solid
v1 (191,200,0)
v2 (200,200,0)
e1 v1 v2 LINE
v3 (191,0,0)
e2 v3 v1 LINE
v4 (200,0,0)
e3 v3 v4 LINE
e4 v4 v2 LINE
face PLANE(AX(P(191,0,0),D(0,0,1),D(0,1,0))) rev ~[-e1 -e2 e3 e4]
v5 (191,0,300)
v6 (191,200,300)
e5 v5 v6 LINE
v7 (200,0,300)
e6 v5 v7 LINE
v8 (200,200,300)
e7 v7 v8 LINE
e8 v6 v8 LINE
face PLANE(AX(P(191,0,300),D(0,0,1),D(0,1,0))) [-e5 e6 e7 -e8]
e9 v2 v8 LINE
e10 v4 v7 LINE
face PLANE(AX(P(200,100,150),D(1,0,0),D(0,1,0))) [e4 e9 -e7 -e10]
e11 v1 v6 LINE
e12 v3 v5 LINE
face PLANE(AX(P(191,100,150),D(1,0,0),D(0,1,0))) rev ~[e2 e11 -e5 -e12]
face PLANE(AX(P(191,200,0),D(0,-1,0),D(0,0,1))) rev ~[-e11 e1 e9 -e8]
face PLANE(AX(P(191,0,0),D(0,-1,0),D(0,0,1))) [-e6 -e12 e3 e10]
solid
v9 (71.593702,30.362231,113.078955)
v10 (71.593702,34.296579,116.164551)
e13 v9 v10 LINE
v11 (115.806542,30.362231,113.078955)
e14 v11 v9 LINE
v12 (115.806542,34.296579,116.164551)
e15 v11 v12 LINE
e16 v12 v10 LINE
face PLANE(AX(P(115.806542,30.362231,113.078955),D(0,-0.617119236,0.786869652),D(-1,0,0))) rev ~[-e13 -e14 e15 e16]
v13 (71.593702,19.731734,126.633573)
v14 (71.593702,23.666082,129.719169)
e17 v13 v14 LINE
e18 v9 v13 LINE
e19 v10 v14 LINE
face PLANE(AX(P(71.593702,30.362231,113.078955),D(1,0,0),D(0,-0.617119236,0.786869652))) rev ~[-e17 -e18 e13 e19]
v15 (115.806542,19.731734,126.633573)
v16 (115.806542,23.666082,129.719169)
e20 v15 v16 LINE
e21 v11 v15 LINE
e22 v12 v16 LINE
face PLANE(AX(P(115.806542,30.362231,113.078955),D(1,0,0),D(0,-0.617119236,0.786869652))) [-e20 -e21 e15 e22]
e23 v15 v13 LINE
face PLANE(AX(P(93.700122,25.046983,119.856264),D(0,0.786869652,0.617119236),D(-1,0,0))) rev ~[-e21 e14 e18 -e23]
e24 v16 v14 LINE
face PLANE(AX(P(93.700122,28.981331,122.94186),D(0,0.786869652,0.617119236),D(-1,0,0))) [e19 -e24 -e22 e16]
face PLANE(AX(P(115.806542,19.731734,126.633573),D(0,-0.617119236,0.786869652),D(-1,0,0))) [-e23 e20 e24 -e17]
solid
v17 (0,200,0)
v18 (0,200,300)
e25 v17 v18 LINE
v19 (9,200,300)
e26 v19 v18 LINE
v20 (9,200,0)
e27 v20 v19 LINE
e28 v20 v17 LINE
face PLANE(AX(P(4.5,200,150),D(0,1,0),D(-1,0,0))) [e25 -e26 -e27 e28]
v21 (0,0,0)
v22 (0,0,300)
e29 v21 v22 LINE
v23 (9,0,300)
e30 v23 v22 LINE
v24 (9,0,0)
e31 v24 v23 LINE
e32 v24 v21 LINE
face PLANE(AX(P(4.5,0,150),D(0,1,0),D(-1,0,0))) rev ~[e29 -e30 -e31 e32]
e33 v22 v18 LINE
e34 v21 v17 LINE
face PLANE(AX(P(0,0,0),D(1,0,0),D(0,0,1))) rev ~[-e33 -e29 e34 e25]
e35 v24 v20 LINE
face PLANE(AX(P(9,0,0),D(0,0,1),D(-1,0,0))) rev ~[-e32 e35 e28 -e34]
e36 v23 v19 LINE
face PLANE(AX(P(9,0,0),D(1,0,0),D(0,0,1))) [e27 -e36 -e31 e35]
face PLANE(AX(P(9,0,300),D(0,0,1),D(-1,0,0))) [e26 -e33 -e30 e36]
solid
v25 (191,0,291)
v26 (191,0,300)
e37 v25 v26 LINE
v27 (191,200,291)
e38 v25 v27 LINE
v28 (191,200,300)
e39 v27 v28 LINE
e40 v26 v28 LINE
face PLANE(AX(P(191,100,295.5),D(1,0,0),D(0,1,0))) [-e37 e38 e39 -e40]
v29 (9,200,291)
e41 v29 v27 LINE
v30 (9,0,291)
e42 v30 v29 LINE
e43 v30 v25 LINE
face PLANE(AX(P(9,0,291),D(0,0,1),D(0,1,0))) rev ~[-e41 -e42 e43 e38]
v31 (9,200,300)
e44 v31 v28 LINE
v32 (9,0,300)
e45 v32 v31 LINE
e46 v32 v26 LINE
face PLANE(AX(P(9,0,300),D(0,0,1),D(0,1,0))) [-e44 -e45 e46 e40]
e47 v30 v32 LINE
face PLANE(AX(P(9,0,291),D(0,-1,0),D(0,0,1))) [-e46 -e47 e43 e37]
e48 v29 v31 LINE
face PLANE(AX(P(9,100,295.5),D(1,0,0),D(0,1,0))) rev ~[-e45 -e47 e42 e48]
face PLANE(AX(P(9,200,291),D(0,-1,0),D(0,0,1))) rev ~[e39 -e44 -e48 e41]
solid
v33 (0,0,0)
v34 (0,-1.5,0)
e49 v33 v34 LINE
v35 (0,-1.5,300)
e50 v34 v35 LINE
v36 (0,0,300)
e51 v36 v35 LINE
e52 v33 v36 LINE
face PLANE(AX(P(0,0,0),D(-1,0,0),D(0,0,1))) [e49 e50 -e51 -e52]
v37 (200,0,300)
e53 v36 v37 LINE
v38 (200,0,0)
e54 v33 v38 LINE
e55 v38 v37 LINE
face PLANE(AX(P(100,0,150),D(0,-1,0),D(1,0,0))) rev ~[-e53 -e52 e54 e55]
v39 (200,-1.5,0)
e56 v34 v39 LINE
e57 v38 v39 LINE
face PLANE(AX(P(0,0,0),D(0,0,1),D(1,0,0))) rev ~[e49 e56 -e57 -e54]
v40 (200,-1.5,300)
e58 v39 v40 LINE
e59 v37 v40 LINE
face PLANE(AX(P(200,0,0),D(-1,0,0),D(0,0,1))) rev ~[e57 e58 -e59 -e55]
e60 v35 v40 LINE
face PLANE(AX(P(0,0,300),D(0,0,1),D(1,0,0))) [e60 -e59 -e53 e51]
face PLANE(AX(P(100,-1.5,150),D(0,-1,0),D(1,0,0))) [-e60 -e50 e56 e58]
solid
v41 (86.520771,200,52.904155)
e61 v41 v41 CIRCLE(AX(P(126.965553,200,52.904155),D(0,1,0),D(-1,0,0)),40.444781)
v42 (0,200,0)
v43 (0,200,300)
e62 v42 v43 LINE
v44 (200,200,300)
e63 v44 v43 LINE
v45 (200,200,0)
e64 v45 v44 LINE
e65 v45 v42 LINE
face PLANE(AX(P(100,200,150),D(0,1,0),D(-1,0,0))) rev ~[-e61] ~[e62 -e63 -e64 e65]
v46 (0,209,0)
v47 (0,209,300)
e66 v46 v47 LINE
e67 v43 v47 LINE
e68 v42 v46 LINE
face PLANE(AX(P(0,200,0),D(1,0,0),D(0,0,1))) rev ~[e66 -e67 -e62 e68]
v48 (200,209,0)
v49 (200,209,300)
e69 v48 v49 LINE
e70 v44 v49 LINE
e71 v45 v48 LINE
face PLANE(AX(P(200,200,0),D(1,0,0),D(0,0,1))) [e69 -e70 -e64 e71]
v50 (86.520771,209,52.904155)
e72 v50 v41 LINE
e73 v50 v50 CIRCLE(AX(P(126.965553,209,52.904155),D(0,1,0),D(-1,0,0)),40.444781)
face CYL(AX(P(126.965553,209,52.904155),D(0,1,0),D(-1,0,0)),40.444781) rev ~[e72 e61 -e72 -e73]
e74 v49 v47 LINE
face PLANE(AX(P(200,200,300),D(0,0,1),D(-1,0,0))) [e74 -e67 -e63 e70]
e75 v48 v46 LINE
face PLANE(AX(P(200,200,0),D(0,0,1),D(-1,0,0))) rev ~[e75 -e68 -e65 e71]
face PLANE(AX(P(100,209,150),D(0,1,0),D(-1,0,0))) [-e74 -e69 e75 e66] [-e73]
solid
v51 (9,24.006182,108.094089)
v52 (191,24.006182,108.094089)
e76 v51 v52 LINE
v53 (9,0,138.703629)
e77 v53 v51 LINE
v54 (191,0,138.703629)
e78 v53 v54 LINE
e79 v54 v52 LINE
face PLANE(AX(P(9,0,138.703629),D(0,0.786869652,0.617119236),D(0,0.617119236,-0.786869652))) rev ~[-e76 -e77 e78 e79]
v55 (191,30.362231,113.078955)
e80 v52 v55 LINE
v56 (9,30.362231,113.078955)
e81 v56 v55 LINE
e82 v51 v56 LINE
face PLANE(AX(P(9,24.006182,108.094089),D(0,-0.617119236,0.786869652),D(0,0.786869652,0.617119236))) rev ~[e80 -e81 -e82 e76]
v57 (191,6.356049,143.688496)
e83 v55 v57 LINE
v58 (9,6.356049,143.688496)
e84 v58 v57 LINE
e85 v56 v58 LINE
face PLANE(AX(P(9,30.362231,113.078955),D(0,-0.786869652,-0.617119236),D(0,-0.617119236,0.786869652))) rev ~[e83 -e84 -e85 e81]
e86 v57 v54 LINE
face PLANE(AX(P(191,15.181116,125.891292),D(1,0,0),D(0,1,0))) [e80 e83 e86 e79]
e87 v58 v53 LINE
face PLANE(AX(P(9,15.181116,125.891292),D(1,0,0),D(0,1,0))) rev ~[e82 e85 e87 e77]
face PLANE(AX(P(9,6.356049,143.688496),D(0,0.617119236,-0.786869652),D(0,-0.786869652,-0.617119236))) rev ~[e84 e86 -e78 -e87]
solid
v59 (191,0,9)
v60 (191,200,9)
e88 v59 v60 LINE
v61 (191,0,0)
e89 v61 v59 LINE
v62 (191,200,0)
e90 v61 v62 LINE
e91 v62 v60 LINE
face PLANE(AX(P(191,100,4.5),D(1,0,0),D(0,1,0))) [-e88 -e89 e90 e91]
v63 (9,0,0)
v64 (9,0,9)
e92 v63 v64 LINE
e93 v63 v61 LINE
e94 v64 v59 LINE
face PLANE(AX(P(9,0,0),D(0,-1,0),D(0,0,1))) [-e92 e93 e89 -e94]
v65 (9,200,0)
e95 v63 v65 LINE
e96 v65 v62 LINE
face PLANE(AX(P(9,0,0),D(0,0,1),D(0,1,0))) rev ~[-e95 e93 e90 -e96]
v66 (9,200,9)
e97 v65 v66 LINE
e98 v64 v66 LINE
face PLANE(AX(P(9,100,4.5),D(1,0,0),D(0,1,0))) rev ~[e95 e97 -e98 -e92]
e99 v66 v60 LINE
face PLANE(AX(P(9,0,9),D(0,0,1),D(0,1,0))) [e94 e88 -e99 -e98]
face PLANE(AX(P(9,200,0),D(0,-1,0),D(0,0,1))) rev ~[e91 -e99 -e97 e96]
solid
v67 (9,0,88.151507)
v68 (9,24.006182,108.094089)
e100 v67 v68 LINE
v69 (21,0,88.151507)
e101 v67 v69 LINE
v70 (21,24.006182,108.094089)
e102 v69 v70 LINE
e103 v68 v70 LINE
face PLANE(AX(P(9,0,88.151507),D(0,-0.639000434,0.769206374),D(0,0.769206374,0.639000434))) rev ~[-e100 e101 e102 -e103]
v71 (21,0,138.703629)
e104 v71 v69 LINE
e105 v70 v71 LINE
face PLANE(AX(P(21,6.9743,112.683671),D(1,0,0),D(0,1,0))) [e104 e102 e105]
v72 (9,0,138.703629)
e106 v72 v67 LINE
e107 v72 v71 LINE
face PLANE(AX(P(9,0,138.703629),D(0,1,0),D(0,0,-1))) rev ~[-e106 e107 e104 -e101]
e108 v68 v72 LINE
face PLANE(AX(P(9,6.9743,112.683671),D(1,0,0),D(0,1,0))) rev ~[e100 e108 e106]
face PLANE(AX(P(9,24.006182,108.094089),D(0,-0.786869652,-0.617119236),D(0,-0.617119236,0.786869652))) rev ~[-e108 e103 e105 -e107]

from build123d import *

# Parameters (mm, degrees)
F0_W      = 200
F0_H      = 300
F1_DEPTH  = 1.5
F2_W      = 9
F2_H      = 300
F3_DEPTH  = 200
F5_DEPTH  = 12
F7_DEPTH  = 182
F8_W      = 44.2128404975
F8_H      = 17.2260019455
F9_DEPTH  = 5
F10_W     = 200
F10_H     = 9
F11_DEPTH = 182
F12_W     = 200
F12_H     = 9
F13_DEPTH = 182
F14_W     = 200
F14_H     = 300
F15_DEPTH = 9
F16_W     = 200
F16_H     = 300
F17_DEPTH = 9
F18_R     = 40.4447812264
F19_DEPTH = 9
F20_W     = 23
F20_H     = 23
F21_DEPTH = 10
F22_W     = 23
F22_H     = 23
F23_DEPTH = 10
F24_W     = 23
F24_H     = 23
F25_DEPTH = 10


# Not quite as in the source:
# - a feature names something its author has since deleted; it is built from what else it names


with BuildPart() as f1:
    # F0 (on Front) → F1 (new body)
    with BuildSketch(Plane.XZ):
        with Locations((100, 150)):
            Rectangle(F0_W, F0_H)
    extrude(amount=F1_DEPTH)


with BuildPart() as f3:
    # F2 (on face) → F3 (new body)
    with BuildSketch(Plane(origin=(0, 0, 0), x_dir=(-1, 0, 0), z_dir=(0, 1, 0))):
        with Locations((-4.5, 150)):
            Rectangle(F2_W, F2_H)
    extrude(amount=F3_DEPTH)


with BuildPart() as f5:
    # F4 (on face) → F5 (new body)
    with BuildSketch(Plane.YZ.offset(9)):
        Polygon((24.0061823279, 108.0940887332), (0, 138.7036293745), (0, 88.1515070796), align=None)
    extrude(amount=F5_DEPTH)


with BuildPart() as f7:
    # F6 (on face) → F7 (new body)
    with BuildSketch(Plane.YZ.offset(9)):
        Polygon((0, 138.7036293745), (24.0061823279, 108.0940887332), (30.3622312434, 113.0789550838), (6.3560489155, 143.6884957251), align=None)
    extrude(amount=F7_DEPTH)


with BuildPart() as f9:
    # F8 (on face) → F9 (new body)
    with BuildSketch(Plane(origin=(0, 73.7094769341, 57.8082227142), x_dir=(-1, 0, 0), z_dir=(0, 0.7868696517, 0.6171192358))):
        with Locations((-93.7001220882, 78.8542820377)):
            Rectangle(F8_W, F8_H)
    extrude(amount=F9_DEPTH)


with BuildPart() as f11:
    # F10 (on face) → F11 (new body)
    with BuildSketch(Plane.YZ.offset(9)):
        with Locations((100, 295.5)):
            Rectangle(F10_W, F10_H)
    extrude(amount=F11_DEPTH)


with BuildPart() as f13:
    # F12 (on face) → F13 (new body)
    with BuildSketch(Plane.YZ.offset(9)):
        with Locations((100, 4.5)):
            Rectangle(F12_W, F12_H)
    extrude(amount=F13_DEPTH)


with BuildPart() as f15:
    # F14 (on face) → F15 (new body)
    with BuildSketch(Plane.YZ.offset(191)):
        with Locations((100, 150)):
            Rectangle(F14_W, F14_H)
    extrude(amount=F15_DEPTH)


with BuildPart() as f17:
    # F16 (on face) → F17 (new body)
    with BuildSketch(Plane(origin=(0, 200, 0), x_dir=(-1, 0, 0), z_dir=(0, 1, 0))):
        with Locations((-100, 150)):
            Rectangle(F16_W, F16_H)
    extrude(amount=F17_DEPTH)

    # F18 (on face) → F19 (cut)
    with BuildSketch(Plane(origin=(0, 209, 0), x_dir=(-1, 0, 0), z_dir=(0, 1, 0))):
        with Locations((-126.9655525684, 52.9041551054)):
            Circle(F18_R)
    extrude(amount=-F19_DEPTH, mode=Mode.SUBTRACT)


with BuildPart() as f21:
    # F20 (on face) → F21 (new body)
    with BuildSketch(Plane(origin=(0, 0, 0), x_dir=(1, 0, 0), z_dir=(0, 0, -1))):
        with Locations((188.5, -11.5)):
            Rectangle(F20_W, F20_H)
    extrude(amount=F21_DEPTH)


with BuildPart() as f23:
    # F22 (on face) → F23 (new body)
    with BuildSketch(Plane(origin=(0, 0, 0), x_dir=(1, 0, 0), z_dir=(0, 0, -1))):
        with Locations((11.5, -197.5752720833)):
            Rectangle(F22_W, F22_H)
    extrude(amount=F23_DEPTH)


with BuildPart() as f25:
    # F24 (on face) → F25 (new body)
    with BuildSketch(Plane(origin=(0, 0, 0), x_dir=(1, 0, 0), z_dir=(0, 0, -1))):
        with Locations((188.5, -197.5)):
            Rectangle(F24_W, F24_H)
    extrude(amount=F25_DEPTH)


solid = Compound([f1.part, f3.part, f5.part, f7.part, f9.part, f11.part, f13.part, f15.part, f17.part])
